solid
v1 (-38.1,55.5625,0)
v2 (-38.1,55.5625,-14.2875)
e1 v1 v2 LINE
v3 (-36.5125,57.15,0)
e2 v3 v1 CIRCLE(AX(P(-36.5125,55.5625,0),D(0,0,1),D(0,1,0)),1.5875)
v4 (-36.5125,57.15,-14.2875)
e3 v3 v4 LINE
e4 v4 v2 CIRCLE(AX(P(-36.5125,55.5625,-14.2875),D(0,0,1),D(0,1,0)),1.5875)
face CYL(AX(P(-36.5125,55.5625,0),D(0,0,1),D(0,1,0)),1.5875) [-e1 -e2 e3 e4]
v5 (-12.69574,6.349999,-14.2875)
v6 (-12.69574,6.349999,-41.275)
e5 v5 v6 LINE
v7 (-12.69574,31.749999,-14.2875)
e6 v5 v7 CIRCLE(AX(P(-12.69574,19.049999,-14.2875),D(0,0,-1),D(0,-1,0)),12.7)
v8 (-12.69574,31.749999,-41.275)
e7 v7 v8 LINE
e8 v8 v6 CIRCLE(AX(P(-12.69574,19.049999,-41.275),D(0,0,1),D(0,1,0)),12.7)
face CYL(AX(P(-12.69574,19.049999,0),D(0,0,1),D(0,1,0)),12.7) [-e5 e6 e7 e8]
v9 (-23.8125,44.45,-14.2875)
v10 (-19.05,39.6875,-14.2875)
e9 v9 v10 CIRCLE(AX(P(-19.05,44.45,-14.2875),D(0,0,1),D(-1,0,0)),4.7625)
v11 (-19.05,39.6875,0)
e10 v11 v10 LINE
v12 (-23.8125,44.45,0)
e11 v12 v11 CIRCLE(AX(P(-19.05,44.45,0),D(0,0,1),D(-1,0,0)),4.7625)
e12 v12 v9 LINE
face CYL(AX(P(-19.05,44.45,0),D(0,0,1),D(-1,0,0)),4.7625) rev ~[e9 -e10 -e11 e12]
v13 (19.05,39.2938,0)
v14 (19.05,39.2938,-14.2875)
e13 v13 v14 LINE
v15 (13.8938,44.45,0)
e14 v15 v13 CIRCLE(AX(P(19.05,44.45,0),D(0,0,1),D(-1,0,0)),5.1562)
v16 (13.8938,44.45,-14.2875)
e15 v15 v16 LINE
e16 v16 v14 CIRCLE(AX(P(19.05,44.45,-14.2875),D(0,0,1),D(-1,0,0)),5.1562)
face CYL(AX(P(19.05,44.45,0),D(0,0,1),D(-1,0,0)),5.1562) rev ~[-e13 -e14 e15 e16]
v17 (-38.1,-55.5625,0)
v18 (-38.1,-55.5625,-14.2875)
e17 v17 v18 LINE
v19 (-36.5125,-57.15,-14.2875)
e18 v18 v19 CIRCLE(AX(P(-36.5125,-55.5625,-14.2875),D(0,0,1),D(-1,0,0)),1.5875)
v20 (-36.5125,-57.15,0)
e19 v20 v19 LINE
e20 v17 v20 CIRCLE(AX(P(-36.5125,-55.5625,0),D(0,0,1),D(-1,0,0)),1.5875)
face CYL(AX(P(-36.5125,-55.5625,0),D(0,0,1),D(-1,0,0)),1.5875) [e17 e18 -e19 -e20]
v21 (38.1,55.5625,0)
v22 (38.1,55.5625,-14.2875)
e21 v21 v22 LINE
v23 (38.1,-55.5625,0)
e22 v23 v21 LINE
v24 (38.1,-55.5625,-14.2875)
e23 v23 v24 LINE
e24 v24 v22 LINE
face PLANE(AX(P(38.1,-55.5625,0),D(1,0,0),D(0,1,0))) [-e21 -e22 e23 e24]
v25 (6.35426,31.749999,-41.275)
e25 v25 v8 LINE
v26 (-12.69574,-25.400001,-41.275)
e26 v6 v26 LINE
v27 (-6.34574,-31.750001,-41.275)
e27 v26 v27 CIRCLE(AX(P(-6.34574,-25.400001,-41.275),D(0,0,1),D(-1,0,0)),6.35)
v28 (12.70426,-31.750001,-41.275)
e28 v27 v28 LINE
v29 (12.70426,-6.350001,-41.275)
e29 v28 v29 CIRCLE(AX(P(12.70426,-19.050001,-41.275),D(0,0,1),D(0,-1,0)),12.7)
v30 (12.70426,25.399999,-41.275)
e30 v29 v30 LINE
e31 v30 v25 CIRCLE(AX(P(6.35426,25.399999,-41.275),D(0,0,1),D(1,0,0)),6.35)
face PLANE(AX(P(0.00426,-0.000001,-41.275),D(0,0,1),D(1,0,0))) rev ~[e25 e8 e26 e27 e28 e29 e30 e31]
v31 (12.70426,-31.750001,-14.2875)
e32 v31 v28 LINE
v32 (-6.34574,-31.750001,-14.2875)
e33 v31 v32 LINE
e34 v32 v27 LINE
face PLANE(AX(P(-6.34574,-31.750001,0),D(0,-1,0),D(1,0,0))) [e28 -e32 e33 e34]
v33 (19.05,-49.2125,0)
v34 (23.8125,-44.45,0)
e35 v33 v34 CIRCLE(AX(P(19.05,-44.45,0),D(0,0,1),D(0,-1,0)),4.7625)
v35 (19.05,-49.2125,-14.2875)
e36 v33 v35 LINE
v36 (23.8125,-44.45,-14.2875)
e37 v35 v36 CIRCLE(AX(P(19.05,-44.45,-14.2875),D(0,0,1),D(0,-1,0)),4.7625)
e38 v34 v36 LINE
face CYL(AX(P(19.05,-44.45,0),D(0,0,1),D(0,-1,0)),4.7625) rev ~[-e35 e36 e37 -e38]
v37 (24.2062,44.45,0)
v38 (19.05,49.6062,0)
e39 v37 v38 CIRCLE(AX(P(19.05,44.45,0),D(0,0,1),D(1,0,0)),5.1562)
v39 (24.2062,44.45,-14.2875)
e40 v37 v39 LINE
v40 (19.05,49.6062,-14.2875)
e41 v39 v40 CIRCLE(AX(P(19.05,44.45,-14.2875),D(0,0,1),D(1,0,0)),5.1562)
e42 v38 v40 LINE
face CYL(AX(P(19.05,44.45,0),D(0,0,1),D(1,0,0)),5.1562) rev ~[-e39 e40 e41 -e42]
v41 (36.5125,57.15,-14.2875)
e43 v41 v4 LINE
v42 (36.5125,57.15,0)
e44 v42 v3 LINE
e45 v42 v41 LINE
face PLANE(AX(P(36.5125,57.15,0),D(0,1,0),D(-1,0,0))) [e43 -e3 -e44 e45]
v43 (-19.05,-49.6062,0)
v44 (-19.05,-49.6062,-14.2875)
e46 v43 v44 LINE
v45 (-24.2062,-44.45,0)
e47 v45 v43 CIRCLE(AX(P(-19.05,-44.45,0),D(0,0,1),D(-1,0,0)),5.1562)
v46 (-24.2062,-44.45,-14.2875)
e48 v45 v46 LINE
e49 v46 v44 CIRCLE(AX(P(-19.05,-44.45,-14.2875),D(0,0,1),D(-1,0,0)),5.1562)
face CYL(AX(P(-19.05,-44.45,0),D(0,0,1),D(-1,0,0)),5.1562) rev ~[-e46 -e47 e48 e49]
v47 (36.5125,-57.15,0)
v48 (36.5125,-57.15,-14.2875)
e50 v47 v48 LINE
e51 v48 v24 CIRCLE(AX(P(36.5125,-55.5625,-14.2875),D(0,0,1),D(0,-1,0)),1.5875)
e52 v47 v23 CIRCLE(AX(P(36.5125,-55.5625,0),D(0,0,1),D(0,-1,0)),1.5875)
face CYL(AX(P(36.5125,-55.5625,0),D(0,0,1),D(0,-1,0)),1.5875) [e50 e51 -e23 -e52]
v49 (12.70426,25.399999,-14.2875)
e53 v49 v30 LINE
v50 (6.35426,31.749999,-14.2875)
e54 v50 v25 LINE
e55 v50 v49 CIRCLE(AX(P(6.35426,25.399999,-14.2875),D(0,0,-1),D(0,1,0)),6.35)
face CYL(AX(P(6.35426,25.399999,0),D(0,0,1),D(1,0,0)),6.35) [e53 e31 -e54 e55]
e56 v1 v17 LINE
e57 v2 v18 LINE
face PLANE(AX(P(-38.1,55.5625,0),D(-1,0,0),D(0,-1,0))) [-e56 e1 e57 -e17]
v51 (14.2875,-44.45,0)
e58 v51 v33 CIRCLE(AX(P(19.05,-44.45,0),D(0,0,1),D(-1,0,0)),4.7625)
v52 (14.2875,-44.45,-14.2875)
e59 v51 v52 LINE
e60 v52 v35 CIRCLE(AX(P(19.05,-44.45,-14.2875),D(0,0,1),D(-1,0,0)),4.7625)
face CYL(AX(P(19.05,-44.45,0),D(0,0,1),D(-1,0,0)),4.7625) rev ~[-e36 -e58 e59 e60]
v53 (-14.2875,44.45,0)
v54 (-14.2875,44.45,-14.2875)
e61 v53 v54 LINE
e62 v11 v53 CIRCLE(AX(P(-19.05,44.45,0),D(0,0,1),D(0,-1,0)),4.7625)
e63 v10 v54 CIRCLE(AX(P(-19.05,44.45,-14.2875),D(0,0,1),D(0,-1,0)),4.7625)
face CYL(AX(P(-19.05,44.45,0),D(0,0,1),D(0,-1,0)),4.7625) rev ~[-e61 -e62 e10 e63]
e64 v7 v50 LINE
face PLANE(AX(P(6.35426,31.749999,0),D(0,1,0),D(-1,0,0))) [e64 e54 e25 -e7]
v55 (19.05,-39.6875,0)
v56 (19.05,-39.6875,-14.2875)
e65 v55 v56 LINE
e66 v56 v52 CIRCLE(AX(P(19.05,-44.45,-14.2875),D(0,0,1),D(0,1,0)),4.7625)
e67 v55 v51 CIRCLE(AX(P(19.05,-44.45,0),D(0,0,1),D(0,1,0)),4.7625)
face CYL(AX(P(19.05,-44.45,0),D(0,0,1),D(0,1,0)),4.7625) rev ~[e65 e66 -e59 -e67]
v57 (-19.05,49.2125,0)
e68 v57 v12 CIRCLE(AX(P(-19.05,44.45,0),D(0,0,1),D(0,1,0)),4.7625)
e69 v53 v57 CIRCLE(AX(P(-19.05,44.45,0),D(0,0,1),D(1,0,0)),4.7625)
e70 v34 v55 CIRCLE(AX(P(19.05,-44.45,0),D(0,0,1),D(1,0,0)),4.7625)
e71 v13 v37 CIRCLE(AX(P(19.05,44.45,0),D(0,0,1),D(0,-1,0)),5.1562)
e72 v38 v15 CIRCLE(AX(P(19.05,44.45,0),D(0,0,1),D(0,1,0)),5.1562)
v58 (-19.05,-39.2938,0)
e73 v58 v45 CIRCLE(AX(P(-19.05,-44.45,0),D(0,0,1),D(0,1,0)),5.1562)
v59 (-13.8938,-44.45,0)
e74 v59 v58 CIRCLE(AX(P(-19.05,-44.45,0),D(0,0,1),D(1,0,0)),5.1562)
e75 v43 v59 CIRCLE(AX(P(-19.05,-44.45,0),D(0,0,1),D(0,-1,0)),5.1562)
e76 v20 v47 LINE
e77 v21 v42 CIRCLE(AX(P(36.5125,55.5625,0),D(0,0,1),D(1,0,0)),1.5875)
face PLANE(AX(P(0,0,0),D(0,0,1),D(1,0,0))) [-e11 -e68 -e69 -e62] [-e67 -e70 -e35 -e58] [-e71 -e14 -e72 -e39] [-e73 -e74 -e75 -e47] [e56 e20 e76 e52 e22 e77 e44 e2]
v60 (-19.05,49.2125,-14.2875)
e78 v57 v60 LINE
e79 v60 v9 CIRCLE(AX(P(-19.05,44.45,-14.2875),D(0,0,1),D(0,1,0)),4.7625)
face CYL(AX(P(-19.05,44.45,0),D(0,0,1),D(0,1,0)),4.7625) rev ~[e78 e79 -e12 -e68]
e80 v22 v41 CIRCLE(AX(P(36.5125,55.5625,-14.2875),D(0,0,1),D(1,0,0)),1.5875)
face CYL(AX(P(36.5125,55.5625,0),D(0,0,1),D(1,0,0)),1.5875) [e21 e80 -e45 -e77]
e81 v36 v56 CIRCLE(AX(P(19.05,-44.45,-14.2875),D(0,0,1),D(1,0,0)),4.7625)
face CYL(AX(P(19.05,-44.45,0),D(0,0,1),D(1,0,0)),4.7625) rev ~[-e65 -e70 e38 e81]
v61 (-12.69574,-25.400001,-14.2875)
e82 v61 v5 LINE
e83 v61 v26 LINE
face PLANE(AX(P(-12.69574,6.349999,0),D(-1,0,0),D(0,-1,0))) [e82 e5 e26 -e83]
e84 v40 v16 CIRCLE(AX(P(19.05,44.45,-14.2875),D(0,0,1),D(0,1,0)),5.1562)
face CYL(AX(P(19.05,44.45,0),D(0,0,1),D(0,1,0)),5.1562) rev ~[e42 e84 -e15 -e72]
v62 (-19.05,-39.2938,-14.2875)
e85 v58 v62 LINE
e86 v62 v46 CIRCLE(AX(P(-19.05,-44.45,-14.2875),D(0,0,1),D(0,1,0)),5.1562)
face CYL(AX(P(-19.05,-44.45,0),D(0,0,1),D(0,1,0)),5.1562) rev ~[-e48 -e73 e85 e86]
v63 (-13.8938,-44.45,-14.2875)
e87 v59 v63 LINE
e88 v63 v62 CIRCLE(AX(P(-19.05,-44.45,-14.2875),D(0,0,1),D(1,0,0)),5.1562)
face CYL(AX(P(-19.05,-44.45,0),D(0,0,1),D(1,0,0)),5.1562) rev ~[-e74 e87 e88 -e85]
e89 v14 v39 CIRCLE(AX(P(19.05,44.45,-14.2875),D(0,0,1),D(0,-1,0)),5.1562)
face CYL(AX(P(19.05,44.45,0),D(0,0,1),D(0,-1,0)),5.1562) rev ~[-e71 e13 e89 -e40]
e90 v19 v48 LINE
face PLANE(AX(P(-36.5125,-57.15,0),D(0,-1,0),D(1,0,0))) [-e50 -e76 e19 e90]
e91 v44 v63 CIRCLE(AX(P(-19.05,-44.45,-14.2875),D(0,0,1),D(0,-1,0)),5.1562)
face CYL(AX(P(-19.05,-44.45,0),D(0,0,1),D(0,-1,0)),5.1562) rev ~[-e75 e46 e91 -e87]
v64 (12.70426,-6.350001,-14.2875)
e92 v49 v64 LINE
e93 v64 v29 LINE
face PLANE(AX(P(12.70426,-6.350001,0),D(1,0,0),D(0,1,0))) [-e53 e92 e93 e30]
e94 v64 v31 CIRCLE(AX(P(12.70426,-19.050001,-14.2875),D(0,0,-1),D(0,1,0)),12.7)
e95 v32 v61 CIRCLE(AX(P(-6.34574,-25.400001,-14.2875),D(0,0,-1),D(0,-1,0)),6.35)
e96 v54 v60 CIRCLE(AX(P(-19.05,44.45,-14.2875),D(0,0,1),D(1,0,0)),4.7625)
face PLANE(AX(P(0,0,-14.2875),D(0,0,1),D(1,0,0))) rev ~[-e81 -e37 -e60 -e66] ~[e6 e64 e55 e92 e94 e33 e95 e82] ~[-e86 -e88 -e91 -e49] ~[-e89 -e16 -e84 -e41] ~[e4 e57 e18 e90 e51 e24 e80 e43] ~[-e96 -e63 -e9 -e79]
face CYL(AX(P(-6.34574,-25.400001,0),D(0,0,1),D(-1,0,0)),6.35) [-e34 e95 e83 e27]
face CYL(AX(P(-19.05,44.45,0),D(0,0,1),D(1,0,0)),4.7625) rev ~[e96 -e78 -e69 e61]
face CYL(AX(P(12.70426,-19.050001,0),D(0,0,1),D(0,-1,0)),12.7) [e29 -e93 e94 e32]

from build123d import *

# Parameters (mm, degrees)
F1_DEPTH = 41.275
F3_DEPTH = 14.2875
F5_DEPTH = 14.2875


with BuildPart() as f1:
    # F0 (on Top) → F1 (new body)
    with BuildSketch(Plane.XY):
        with BuildLine():
            Line((-6.3457395977, -31.7500010133), (12.7042604023, -31.7500010133))
            ThreePointArc((12.7042604023, -31.7500010133), (25.4042604023, -19.0500010133), (12.7042604023, -6.3500010133))
            Line((12.7042604023, -6.3500010133), (12.7042604023, 25.3999989867))
            ThreePointArc((12.7042604023, 25.3999989867), (10.8443884629, 29.8901270473), (6.3542604023, 31.7499989867))
            Line((6.3542604023, 31.7499989867), (-12.6957395977, 31.7499989867))
            ThreePointArc((-12.6957395977, 31.7499989867), (-25.3957395977, 19.0499989867), (-12.6957395977, 6.3499989867))
            Line((-12.6957395977, 6.3499989867), (-12.6957395977, -25.4000010133))
            ThreePointArc((-12.6957395977, -25.4000010133), (-10.8358676582, -29.8901290738), (-6.3457395977, -31.7500010133))
        make_face()
    extrude(amount=-F1_DEPTH)

    # F2 (on face) → F3 (join)
    with BuildSketch(Plane.XY):
        with BuildLine():
            Line((-36.5125, -57.15), (36.5125, -57.15))
            ThreePointArc((36.5125, -57.15), (37.6350320151, -56.6850320151), (38.1, -55.5625))
            Line((38.1, -55.5625), (38.1, 55.5625))
            ThreePointArc((38.1, 55.5625), (37.6350320151, 56.6850320151), (36.5125, 57.15))
            Line((36.5125, 57.15), (-36.5125, 57.15))
            ThreePointArc((-36.5125, 57.15), (-37.6350320151, 56.6850320151), (-38.1, 55.5625))
            Line((-38.1, 55.5625), (-38.1, -55.5625))
            ThreePointArc((-38.1, -55.5625), (-37.6350320151, -56.6850320151), (-36.5125, -57.15))
        make_face()
        with BuildLine():
            Line((-12.6957395977, 31.7499989867), (6.3542604023, 31.7499989867))
            ThreePointArc((6.3542604023, 31.7499989867), (10.8443884629, 29.8901270473), (12.7042604023, 25.3999989867))
            Line((12.7042604023, 25.3999989867), (12.7042604023, -6.3500010133))
            ThreePointArc((12.7042604023, -6.3500010133), (25.4042604023, -19.0500010133), (12.7042604023, -31.7500010133))
            Line((12.7042604023, -31.7500010133), (-6.3457395977, -31.7500010133))
            ThreePointArc((-6.3457395977, -31.7500010133), (-10.8358676582, -29.8901290738), (-12.6957395977, -25.4000010133))
            Line((-12.6957395977, -25.4000010133), (-12.6957395977, 6.3499989867))
            ThreePointArc((-12.6957395977, 6.3499989867), (-25.3957395977, 19.0499989867), (-12.6957395977, 31.7499989867))
        make_face(mode=Mode.SUBTRACT)
    extrude(amount=-F3_DEPTH)

    # F4 (on face) → F5 (cut)
    with BuildSketch(Plane.XY):
        with BuildLine():
            Line((19.05, 39.2938), (19.05, 44.45))
            Line((19.05, 44.45), (13.8938, 44.45))
            ThreePointArc((13.8938, 44.45), (15.4040160148, 40.8040160148), (19.05, 39.2938))
        make_face()
        with BuildLine():
            Line((19.05, 44.45), (24.2062, 44.45))
            ThreePointArc((24.2062, 44.45), (22.6959839852, 48.0959839852), (19.05, 49.6062))
            Line((19.05, 49.6062), (19.05, 44.45))
        make_face()
        with BuildLine():
            Line((19.05, 44.45), (19.05, 49.6062))
            ThreePointArc((19.05, 49.6062), (15.4040160148, 48.0959839852), (13.8938, 44.45))
            Line((13.8938, 44.45), (19.05, 44.45))
        make_face()
        with BuildLine():
            ThreePointArc((19.05, 39.2938), (22.6959839852, 40.8040160148), (24.2062, 44.45))
            Line((24.2062, 44.45), (19.05, 44.45))
            Line((19.05, 44.45), (19.05, 39.2938))
        make_face()
        with BuildLine():
            Line((-19.05, -44.45), (-13.8938, -44.45))
            ThreePointArc((-13.8938, -44.45), (-15.4040160148, -40.8040160148), (-19.05, -39.2938))
            Line((-19.05, -39.2938), (-19.05, -44.45))
        make_face()
        with BuildLine():
            ThreePointArc((-19.05, -49.6062), (-15.4040160148, -48.0959839852), (-13.8938, -44.45))
            Line((-13.8938, -44.45), (-19.05, -44.45))
            Line((-19.05, -44.45), (-19.05, -49.6062))
        make_face()
        with BuildLine():
            ThreePointArc((-24.2062, -44.45), (-22.6959839852, -48.0959839852), (-19.05, -49.6062))
            Line((-19.05, -49.6062), (-19.05, -44.45))
            Line((-19.05, -44.45), (-24.2062, -44.45))
        make_face()
        with BuildLine():
            Line((-24.2062, -44.45), (-19.05, -44.45))
            Line((-19.05, -44.45), (-19.05, -39.2938))
            ThreePointArc((-19.05, -39.2938), (-22.6959839852, -40.8040160148), (-24.2062, -44.45))
        make_face()
        with BuildLine():
            Line((-14.2875, 44.45), (-19.05, 44.45))
            Line((-19.05, 44.45), (-19.05, 39.6875))
            ThreePointArc((-19.05, 39.6875), (-15.6824039546, 41.0824039546), (-14.2875, 44.45))
        make_face()
        with BuildLine():
            ThreePointArc((-14.2875, 44.45), (-15.6824039546, 47.8175960454), (-19.05, 49.2125))
            Line((-19.05, 49.2125), (-19.05, 44.45))
            Line((-19.05, 44.45), (-14.2875, 44.45))
        make_face()
        with BuildLine():
            Line((-19.05, 44.45), (-19.05, 49.2125))
            ThreePointArc((-19.05, 49.2125), (-22.4175960454, 47.8175960454), (-23.8125, 44.45))
            Line((-23.8125, 44.45), (-19.05, 44.45))
        make_face()
        with BuildLine():
            Line((-19.05, 39.6875), (-19.05, 44.45))
            Line((-19.05, 44.45), (-23.8125, 44.45))
            ThreePointArc((-23.8125, 44.45), (-22.4175960454, 41.0824039546), (-19.05, 39.6875))
        make_face()
        with BuildLine():
            Line((19.05, -44.45), (23.8125, -44.45))
            ThreePointArc((23.8125, -44.45), (22.4175960454, -41.0824039546), (19.05, -39.6875))
            Line((19.05, -39.6875), (19.05, -44.45))
        make_face()
        with BuildLine():
            Line((14.2875, -44.45), (19.05, -44.45))
            Line((19.05, -44.45), (19.05, -39.6875))
            ThreePointArc((19.05, -39.6875), (15.6824039546, -41.0824039546), (14.2875, -44.45))
        make_face()
        with BuildLine():
            Line((19.05, -49.2125), (19.05, -44.45))
            Line((19.05, -44.45), (14.2875, -44.45))
            ThreePointArc((14.2875, -44.45), (15.6824039546, -47.8175960454), (19.05, -49.2125))
        make_face()
        with BuildLine():
            ThreePointArc((19.05, -49.2125), (22.4175960454, -47.8175960454), (23.8125, -44.45))
            Line((23.8125, -44.45), (19.05, -44.45))
            Line((19.05, -44.45), (19.05, -49.2125))
        make_face()
    extrude(amount=-F5_DEPTH, mode=Mode.SUBTRACT)


solid = f1.part
